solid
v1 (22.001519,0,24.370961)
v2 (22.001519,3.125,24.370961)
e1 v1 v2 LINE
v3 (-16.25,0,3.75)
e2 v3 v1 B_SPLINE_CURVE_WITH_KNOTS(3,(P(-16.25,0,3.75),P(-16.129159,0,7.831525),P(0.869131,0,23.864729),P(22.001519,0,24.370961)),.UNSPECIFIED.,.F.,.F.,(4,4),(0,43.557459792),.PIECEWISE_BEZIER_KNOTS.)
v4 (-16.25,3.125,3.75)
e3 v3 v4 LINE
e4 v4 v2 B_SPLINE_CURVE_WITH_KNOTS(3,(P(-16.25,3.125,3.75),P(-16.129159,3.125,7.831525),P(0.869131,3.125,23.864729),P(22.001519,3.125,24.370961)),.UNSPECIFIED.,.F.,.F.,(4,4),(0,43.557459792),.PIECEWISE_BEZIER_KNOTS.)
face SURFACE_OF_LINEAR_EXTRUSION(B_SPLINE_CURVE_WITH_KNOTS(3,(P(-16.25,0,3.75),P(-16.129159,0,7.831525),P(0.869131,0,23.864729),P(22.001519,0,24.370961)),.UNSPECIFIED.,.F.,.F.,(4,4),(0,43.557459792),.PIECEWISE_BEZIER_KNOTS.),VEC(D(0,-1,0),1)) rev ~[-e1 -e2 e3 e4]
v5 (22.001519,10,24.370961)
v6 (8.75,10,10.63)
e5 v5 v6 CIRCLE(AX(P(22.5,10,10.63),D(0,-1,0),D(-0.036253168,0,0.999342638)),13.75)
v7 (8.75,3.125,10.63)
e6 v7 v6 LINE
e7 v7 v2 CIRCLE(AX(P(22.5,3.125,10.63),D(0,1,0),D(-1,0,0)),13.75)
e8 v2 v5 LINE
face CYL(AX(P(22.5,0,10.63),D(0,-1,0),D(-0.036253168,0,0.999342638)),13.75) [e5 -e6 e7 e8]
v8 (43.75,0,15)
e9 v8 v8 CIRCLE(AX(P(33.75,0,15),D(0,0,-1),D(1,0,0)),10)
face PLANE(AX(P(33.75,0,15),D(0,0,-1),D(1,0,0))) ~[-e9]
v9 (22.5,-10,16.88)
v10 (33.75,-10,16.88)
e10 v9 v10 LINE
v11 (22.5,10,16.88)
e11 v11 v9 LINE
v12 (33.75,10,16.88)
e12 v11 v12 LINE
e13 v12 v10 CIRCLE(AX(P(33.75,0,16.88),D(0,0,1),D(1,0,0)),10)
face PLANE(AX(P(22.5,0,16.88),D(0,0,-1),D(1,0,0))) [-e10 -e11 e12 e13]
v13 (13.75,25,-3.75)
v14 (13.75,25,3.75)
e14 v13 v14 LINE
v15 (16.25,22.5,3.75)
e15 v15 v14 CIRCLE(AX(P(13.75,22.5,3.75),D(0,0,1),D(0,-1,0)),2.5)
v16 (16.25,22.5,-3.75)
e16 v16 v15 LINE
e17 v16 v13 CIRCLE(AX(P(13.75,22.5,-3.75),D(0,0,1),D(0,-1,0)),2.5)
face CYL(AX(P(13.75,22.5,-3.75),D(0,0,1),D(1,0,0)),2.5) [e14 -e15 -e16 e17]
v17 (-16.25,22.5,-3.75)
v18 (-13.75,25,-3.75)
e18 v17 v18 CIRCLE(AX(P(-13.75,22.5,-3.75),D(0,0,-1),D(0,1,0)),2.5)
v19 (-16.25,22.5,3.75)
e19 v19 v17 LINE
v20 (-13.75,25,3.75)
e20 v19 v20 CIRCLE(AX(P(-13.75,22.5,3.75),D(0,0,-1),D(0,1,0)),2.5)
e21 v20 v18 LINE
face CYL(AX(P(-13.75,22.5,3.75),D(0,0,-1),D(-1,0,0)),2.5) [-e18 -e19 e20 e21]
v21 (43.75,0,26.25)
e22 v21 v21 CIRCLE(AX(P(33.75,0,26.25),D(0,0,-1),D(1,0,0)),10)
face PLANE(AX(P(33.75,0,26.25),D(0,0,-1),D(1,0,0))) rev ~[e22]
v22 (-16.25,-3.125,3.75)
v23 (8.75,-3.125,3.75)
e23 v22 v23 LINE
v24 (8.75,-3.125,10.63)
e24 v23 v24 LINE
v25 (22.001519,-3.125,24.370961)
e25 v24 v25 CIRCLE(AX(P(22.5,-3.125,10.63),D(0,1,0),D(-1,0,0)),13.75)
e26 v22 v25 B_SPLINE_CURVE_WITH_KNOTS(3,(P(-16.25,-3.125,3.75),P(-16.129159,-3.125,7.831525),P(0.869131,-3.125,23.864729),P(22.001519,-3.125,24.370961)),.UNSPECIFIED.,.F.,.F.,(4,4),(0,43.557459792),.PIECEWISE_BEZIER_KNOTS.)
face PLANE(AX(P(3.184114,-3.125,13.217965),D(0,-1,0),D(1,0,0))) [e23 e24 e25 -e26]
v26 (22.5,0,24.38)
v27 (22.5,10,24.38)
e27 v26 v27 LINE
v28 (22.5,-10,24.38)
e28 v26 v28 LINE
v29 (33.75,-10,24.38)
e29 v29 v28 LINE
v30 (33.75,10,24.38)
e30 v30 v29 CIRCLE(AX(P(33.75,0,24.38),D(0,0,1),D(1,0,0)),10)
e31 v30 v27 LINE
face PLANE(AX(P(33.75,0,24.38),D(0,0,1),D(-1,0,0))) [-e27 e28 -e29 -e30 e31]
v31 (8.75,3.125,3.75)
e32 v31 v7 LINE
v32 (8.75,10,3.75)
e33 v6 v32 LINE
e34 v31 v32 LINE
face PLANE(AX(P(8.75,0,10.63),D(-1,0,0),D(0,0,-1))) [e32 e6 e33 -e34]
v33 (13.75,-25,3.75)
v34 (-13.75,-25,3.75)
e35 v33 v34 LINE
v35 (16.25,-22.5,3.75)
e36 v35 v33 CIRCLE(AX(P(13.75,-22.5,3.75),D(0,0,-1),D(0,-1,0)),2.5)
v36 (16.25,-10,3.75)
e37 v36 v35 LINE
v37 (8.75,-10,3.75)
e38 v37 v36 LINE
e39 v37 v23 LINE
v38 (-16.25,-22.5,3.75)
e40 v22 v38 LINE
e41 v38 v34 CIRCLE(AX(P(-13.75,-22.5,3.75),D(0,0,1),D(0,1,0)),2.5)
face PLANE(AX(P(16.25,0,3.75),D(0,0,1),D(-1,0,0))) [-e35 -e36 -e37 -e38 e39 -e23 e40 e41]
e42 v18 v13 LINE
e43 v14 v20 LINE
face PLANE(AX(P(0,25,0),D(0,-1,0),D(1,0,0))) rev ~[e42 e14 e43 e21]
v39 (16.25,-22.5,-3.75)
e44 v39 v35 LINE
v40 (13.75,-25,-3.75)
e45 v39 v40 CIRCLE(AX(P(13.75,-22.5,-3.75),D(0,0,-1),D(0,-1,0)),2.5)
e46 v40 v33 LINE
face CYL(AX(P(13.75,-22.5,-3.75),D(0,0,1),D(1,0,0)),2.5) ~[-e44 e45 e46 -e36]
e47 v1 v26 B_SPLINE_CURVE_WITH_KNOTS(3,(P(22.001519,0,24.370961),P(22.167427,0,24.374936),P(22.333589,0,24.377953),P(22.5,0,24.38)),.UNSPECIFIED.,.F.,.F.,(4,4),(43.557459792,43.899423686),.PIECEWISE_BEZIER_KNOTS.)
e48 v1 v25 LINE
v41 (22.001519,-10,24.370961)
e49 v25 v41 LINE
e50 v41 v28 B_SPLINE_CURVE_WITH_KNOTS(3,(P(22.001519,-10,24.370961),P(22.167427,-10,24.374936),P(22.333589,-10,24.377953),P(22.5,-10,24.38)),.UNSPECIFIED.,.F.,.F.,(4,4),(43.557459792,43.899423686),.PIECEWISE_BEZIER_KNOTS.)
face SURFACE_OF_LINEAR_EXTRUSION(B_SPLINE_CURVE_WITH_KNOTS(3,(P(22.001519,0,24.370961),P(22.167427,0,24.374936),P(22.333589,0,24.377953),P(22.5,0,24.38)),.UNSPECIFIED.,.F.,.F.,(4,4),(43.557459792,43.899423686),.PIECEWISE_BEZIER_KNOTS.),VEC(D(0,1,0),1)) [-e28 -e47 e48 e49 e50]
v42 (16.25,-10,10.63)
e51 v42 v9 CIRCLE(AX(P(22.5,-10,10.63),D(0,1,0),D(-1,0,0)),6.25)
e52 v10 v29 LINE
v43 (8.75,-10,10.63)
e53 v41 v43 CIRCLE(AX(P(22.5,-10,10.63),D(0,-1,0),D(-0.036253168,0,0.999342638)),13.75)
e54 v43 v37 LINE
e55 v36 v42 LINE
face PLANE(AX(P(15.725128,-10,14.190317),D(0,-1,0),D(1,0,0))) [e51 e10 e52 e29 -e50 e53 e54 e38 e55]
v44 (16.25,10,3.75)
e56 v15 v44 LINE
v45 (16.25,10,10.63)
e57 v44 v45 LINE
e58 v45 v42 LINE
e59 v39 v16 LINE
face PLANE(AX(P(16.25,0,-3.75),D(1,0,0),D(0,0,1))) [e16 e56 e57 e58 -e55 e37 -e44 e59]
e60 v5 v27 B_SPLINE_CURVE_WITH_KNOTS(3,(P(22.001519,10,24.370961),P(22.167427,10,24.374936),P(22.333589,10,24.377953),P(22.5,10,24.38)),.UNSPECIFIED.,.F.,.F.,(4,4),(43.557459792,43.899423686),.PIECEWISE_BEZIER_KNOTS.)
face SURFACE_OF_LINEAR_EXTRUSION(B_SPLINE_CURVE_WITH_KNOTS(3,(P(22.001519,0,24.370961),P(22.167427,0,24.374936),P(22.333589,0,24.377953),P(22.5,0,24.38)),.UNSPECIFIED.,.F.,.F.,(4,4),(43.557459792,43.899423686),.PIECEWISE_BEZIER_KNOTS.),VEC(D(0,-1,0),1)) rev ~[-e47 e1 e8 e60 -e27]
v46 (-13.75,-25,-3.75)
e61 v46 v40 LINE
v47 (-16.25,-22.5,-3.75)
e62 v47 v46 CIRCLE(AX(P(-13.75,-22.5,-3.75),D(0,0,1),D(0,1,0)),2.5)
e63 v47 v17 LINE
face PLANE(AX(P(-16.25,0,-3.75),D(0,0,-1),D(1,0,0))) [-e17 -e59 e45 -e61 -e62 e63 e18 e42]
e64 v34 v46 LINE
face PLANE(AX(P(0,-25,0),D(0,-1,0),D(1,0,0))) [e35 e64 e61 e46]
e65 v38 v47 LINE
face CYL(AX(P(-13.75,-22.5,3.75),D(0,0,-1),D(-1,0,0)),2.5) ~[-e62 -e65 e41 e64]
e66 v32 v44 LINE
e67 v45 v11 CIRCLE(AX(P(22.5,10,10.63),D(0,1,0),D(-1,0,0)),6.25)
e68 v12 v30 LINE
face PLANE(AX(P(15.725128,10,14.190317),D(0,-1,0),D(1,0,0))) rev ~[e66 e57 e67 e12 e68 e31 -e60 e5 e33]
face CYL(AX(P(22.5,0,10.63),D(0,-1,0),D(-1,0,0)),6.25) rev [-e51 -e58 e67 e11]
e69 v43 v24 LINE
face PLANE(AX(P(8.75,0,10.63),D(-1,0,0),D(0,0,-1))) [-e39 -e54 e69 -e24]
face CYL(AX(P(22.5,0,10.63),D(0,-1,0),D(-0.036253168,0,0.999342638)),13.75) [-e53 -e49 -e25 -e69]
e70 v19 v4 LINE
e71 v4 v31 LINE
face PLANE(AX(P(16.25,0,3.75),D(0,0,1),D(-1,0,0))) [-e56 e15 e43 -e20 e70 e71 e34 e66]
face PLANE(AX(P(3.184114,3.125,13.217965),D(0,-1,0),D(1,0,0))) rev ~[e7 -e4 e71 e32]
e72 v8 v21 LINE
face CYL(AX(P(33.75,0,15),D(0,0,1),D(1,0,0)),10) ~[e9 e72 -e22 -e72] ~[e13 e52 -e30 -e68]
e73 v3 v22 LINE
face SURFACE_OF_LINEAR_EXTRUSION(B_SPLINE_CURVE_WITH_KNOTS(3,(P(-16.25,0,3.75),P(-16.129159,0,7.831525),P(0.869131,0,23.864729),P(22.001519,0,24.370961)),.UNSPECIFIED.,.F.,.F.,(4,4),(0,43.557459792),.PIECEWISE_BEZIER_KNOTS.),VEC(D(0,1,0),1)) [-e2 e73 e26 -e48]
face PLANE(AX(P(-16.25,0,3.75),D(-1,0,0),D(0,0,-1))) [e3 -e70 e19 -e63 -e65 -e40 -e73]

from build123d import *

# Parameters (mm, degrees)
F1_DEPTH = 25
F0_W     = 10
F0_H     = 7.5
F2_DEPTH = 10
F3_DEPTH = 3.125
F5_R     = 2.5


# Not quite as in the source:
# - a feature names something its author has since deleted; it is built from what else it names


with BuildPart() as f1:
    # F0 (on Front) → F1 (new body, symmetric)
    with BuildSketch(Plane.XZ):
        Polygon((16.25, -3.75), (16.25, 3.75), (8.75, 3.75), (-16.25, 3.75), (-16.25, -3.75), align=None)
    extrude(amount=F1_DEPTH, both=True)

    # F0 (on Front) → F2 (join, symmetric)
    with BuildSketch(Plane.XZ):
        with BuildLine():
            Line((8.75, 3.75), (16.25, 3.75))
            Line((16.25, 3.75), (16.25, 10.63))
            ThreePointArc((16.25, 10.63), (18.0805826176, 15.0494173824), (22.5, 16.88))
            Line((22.5, 16.88), (23.75, 16.88))
            Line((23.75, 16.88), (23.75, 24.38))
            Line((23.75, 24.38), (22.5, 24.38))
            add(Edge.make_bspline(
                [(22.0015189443, 24.3709612705), (22.1674265419, 24.3749356352), (22.3335889493, 24.3779529773), (22.5, 24.38)],
                knots=[43.5574597922, 43.5574597922, 43.5574597922, 43.5574597922, 43.8994236864, 43.8994236864, 43.8994236864, 43.8994236864], degree=3))
            ThreePointArc((22.0015189443, 24.3709612705), (12.6026110889, 20.1748516354), (8.75, 10.63))
            Line((8.75, 10.63), (8.75, 3.75))
        make_face()
        with Locations((28.75, 20.63)):
            Rectangle(F0_W, F0_H)
    extrude(amount=F2_DEPTH, both=True)

    # F0 (on Front) → F3 (join, symmetric)
    with BuildSketch(Plane.XZ):
        with BuildLine():
            Line((-16.25, 3.75), (8.75, 3.75))
            Line((8.75, 3.75), (8.75, 10.63))
            ThreePointArc((8.75, 10.63), (12.6026110889, 20.1748516354), (22.0015189443, 24.3709612705))
            add(Edge.make_bspline(
                [(-16.25, 3.75), (-16.1291590572, 7.8315246284), (0.86913148, 23.864728791), (22.0015189443, 24.3709612705)],
                knots=[0, 0, 0, 0, 43.5574597922, 43.5574597922, 43.5574597922, 43.5574597922], degree=3))
        make_face()
    extrude(amount=F3_DEPTH, both=True)

    # F0 (on Front) → F4 (revolve)
    with BuildSketch(Plane.XZ):
        Polygon((33.75, 24.38), (33.75, 16.88), (33.75, 15), (43.75, 15), (43.75, 26.25), (33.75, 26.25), align=None)
    revolve(axis=Axis((33.75, 0, 20.625), (0, 0, -1)))

    # F5
    f5_edges = [f1.edges().sort_by_distance(p)[0] for p in [
        (-16.25, -25, 0),
        (16.25, -25, 0),
        (-16.25, 25, 0),
        (16.25, 25, 0),
    ]]
    fillet(f5_edges, radius=F5_R)


solid = f1.part
